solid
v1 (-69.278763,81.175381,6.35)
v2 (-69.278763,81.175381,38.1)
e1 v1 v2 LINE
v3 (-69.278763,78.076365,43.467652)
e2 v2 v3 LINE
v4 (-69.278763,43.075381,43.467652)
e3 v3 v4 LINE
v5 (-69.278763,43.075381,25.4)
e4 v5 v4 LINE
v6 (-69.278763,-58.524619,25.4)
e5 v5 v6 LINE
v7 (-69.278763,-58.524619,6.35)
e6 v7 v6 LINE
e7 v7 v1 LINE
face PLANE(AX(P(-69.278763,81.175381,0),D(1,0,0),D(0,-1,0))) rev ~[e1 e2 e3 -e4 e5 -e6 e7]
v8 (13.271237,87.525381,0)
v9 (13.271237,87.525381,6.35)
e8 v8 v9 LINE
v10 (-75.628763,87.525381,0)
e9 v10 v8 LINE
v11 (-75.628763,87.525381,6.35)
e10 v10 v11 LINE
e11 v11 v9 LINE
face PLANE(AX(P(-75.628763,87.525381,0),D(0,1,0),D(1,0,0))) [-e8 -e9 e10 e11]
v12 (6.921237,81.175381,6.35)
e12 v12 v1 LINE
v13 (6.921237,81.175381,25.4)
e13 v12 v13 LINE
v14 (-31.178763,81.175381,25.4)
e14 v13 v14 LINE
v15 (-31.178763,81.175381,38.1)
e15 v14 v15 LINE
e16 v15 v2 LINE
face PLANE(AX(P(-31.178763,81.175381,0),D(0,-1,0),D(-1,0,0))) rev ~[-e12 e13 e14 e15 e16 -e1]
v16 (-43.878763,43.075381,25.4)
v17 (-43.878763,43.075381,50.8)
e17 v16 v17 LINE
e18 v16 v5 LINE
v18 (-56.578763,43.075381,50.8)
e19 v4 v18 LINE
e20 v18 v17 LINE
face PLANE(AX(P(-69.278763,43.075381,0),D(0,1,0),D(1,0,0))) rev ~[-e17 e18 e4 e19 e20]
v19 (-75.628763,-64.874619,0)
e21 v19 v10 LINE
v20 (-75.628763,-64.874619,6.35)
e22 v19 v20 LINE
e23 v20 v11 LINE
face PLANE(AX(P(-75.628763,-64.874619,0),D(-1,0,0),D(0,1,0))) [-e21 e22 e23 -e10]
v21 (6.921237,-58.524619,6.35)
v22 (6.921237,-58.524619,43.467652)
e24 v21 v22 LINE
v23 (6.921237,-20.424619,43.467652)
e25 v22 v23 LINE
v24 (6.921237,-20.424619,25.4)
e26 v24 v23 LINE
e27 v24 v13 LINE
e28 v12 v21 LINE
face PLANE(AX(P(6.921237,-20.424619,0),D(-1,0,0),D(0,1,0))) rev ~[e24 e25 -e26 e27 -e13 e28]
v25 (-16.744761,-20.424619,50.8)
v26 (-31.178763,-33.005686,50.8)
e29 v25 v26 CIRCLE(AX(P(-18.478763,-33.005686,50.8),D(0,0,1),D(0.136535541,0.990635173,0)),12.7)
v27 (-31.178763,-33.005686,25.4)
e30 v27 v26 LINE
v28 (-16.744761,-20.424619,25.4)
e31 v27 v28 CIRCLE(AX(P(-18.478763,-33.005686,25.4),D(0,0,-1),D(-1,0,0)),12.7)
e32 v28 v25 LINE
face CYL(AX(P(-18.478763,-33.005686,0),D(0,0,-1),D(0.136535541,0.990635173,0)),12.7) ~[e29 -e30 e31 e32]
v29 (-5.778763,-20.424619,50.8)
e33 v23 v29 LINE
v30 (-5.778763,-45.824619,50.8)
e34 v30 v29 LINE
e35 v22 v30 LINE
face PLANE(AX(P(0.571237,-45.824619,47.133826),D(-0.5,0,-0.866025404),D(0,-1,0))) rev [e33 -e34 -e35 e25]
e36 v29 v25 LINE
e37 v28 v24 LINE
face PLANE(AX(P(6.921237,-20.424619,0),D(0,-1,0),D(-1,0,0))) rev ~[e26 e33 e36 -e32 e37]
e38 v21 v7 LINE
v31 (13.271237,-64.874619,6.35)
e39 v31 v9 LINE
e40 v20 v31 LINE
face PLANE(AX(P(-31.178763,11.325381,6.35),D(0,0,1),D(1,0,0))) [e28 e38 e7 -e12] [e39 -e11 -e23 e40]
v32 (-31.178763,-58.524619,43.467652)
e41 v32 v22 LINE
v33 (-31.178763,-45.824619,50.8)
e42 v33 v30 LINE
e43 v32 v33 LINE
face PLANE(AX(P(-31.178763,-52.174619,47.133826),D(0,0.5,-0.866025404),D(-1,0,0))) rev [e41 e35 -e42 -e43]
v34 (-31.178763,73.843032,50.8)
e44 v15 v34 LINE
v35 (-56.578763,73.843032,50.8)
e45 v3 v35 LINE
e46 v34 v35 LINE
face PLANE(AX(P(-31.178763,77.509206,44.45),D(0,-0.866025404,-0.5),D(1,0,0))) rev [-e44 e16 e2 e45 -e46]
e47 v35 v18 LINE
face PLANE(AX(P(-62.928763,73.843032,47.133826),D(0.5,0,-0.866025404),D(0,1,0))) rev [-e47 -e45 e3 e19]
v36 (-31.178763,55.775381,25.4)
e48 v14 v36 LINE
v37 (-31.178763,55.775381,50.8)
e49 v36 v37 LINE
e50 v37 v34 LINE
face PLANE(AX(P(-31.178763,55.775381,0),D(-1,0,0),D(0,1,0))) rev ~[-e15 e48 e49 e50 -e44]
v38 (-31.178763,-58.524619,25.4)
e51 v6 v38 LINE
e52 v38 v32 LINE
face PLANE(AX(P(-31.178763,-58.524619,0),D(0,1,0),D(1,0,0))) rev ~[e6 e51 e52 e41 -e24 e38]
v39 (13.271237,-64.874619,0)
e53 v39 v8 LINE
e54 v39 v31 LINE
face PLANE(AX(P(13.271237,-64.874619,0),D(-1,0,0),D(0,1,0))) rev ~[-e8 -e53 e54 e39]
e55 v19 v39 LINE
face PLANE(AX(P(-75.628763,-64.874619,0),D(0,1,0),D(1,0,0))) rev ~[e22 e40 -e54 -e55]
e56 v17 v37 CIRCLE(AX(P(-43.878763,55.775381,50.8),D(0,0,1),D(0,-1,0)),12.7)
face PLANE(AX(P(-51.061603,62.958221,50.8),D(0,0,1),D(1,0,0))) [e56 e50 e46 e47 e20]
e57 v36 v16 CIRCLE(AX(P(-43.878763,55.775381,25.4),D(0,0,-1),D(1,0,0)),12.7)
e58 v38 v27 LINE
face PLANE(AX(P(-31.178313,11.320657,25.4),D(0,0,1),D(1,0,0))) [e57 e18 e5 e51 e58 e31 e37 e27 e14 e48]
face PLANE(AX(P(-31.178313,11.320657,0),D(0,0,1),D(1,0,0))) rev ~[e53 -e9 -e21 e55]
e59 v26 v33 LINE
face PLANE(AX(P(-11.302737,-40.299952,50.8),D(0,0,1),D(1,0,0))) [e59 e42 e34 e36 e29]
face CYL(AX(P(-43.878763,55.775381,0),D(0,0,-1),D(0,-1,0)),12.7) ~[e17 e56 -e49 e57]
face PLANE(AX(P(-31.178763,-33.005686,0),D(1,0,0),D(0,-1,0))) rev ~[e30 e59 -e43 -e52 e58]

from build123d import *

# Parameters (mm, degrees)
F0_W        = 88.9
F0_H        = 152.4
F1_DEPTH    = 6.35
F2_DEPTH    = 25.4
F3_DEPTH    = 50.8
F4_C1_SIZE2 = 12.7
F4_C1_SIZE  = 7.3323484187
F4_C2_SIZE2 = 12.7
F4_C2_SIZE  = 7.3323484187
F4_C3_SIZE2 = 7.3323484187
F4_C3_SIZE  = 12.7
F4_C4_SIZE2 = 12.7
F4_C4_SIZE  = 7.3323484187


with BuildPart() as f1:
    # F0 (on Top) → F1 (new body)
    with BuildSketch(Plane.XY):
        with Locations((-31.1787627001, 11.3253805135)):
            Rectangle(F0_W, F0_H)
        Polygon((-69.2787627001, 43.0753805135), (-69.2787627001, 81.1753805135), (-31.1787627001, 81.1753805135), (6.9212372999, 81.1753805135), (6.9212372999, -20.4246194865), (6.9212372999, -58.5246194865), (-31.1787627001, -58.5246194865), (-69.2787627001, -58.5246194865), align=None, mode=Mode.SUBTRACT)
    extrude(amount=F1_DEPTH)

    # F0 (on Top) → F2 (join)
    with BuildSketch(Plane.XY):
        with BuildLine():
            Line((6.9212372999, 81.1753805135), (-31.1787627001, 81.1753805135))
            Line((-31.1787627001, 81.1753805135), (-31.1787627001, 55.7753805135))
            ThreePointArc((-31.1787627001, 55.7753805135), (-34.898506579, 46.7951243925), (-43.8787627001, 43.0753805135))
            Line((-43.8787627001, 43.0753805135), (-69.2787627001, 43.0753805135))
            Line((-69.2787627001, 43.0753805135), (-69.2787627001, -58.5246194865))
            Line((-69.2787627001, -58.5246194865), (-31.1787627001, -58.5246194865))
            Line((-31.1787627001, -58.5246194865), (-31.1787627001, -33.0056861837))
            ThreePointArc((-31.1787627001, -33.0056861837), (-26.8234670857, -23.4319769383), (-16.7447613275, -20.4246194865))
            Line((-16.7447613275, -20.4246194865), (6.9212372999, -20.4246194865))
            Line((6.9212372999, -20.4246194865), (6.9212372999, 81.1753805135))
        make_face()
    extrude(amount=F2_DEPTH)

    # F0 (on Top) → F3 (join)
    with BuildSketch(Plane.XY):
        with BuildLine():
            Line((-31.1787627001, 81.1753805135), (-69.2787627001, 81.1753805135))
            Line((-69.2787627001, 81.1753805135), (-69.2787627001, 43.0753805135))
            Line((-69.2787627001, 43.0753805135), (-43.8787627001, 43.0753805135))
            ThreePointArc((-43.8787627001, 43.0753805135), (-34.898506579, 46.7951243925), (-31.1787627001, 55.7753805135))
            Line((-31.1787627001, 55.7753805135), (-31.1787627001, 81.1753805135))
        make_face()
        with BuildLine():
            Line((6.9212372999, -58.5246194865), (6.9212372999, -20.4246194865))
            Line((6.9212372999, -20.4246194865), (-16.7447613275, -20.4246194865))
            ThreePointArc((-16.7447613275, -20.4246194865), (-26.8234670857, -23.4319769383), (-31.1787627001, -33.0056861837))
            Line((-31.1787627001, -33.0056861837), (-31.1787627001, -58.5246194865))
            Line((-31.1787627001, -58.5246194865), (6.9212372999, -58.5246194865))
        make_face()
    extrude(amount=F3_DEPTH)

    # F4: chamfer of 12.7 x 7.3323484187 on 4 edges, made by hand

    # F4_c1
    f4_c1_edges = [f1.edges().sort_by_distance(p)[0] for p in [
        (-12.1287627001, -58.5246194865, 50.8),
    ]]
    f4_c1_side = f1.faces().sort_by_distance((-12.1287627001, -58.5246194865, 50.6533530316))[0]
    chamfer(f4_c1_edges, length=F4_C1_SIZE, length2=F4_C1_SIZE2, reference=f4_c1_side)

    # F4_c2
    f4_c2_edges = [f1.edges().sort_by_distance(p)[0] for p in [
        (6.9212372999, -33.1246194865, 50.8),
    ]]
    f4_c2_side = f1.faces().sort_by_distance((6.9212372999, -33.1246194865, 50.6533530316))[0]
    chamfer(f4_c2_edges, length=F4_C2_SIZE, length2=F4_C2_SIZE2, reference=f4_c2_side)

    # F4_c3
    f4_c3_edges = [f1.edges().sort_by_distance(p)[0] for p in [
        (-50.2287627001, 81.1753805135, 50.8),
    ]]
    f4_c3_side = f1.faces().sort_by_distance((-50.2287627001, 81.1753805135, 50.6533530316))[0]
    chamfer(f4_c3_edges, length=F4_C3_SIZE, length2=F4_C3_SIZE2, reference=f4_c3_side)

    # F4_c4
    f4_c4_edges = [f1.edges().sort_by_distance(p)[0] for p in [
        (-69.2787627001, 58.4592063042, 50.8),
    ]]
    f4_c4_side = f1.faces().sort_by_distance((-69.2787627001, 58.4592063042, 50.6533530316))[0]
    chamfer(f4_c4_edges, length=F4_C4_SIZE, length2=F4_C4_SIZE2, reference=f4_c4_side)


solid = f1.part
